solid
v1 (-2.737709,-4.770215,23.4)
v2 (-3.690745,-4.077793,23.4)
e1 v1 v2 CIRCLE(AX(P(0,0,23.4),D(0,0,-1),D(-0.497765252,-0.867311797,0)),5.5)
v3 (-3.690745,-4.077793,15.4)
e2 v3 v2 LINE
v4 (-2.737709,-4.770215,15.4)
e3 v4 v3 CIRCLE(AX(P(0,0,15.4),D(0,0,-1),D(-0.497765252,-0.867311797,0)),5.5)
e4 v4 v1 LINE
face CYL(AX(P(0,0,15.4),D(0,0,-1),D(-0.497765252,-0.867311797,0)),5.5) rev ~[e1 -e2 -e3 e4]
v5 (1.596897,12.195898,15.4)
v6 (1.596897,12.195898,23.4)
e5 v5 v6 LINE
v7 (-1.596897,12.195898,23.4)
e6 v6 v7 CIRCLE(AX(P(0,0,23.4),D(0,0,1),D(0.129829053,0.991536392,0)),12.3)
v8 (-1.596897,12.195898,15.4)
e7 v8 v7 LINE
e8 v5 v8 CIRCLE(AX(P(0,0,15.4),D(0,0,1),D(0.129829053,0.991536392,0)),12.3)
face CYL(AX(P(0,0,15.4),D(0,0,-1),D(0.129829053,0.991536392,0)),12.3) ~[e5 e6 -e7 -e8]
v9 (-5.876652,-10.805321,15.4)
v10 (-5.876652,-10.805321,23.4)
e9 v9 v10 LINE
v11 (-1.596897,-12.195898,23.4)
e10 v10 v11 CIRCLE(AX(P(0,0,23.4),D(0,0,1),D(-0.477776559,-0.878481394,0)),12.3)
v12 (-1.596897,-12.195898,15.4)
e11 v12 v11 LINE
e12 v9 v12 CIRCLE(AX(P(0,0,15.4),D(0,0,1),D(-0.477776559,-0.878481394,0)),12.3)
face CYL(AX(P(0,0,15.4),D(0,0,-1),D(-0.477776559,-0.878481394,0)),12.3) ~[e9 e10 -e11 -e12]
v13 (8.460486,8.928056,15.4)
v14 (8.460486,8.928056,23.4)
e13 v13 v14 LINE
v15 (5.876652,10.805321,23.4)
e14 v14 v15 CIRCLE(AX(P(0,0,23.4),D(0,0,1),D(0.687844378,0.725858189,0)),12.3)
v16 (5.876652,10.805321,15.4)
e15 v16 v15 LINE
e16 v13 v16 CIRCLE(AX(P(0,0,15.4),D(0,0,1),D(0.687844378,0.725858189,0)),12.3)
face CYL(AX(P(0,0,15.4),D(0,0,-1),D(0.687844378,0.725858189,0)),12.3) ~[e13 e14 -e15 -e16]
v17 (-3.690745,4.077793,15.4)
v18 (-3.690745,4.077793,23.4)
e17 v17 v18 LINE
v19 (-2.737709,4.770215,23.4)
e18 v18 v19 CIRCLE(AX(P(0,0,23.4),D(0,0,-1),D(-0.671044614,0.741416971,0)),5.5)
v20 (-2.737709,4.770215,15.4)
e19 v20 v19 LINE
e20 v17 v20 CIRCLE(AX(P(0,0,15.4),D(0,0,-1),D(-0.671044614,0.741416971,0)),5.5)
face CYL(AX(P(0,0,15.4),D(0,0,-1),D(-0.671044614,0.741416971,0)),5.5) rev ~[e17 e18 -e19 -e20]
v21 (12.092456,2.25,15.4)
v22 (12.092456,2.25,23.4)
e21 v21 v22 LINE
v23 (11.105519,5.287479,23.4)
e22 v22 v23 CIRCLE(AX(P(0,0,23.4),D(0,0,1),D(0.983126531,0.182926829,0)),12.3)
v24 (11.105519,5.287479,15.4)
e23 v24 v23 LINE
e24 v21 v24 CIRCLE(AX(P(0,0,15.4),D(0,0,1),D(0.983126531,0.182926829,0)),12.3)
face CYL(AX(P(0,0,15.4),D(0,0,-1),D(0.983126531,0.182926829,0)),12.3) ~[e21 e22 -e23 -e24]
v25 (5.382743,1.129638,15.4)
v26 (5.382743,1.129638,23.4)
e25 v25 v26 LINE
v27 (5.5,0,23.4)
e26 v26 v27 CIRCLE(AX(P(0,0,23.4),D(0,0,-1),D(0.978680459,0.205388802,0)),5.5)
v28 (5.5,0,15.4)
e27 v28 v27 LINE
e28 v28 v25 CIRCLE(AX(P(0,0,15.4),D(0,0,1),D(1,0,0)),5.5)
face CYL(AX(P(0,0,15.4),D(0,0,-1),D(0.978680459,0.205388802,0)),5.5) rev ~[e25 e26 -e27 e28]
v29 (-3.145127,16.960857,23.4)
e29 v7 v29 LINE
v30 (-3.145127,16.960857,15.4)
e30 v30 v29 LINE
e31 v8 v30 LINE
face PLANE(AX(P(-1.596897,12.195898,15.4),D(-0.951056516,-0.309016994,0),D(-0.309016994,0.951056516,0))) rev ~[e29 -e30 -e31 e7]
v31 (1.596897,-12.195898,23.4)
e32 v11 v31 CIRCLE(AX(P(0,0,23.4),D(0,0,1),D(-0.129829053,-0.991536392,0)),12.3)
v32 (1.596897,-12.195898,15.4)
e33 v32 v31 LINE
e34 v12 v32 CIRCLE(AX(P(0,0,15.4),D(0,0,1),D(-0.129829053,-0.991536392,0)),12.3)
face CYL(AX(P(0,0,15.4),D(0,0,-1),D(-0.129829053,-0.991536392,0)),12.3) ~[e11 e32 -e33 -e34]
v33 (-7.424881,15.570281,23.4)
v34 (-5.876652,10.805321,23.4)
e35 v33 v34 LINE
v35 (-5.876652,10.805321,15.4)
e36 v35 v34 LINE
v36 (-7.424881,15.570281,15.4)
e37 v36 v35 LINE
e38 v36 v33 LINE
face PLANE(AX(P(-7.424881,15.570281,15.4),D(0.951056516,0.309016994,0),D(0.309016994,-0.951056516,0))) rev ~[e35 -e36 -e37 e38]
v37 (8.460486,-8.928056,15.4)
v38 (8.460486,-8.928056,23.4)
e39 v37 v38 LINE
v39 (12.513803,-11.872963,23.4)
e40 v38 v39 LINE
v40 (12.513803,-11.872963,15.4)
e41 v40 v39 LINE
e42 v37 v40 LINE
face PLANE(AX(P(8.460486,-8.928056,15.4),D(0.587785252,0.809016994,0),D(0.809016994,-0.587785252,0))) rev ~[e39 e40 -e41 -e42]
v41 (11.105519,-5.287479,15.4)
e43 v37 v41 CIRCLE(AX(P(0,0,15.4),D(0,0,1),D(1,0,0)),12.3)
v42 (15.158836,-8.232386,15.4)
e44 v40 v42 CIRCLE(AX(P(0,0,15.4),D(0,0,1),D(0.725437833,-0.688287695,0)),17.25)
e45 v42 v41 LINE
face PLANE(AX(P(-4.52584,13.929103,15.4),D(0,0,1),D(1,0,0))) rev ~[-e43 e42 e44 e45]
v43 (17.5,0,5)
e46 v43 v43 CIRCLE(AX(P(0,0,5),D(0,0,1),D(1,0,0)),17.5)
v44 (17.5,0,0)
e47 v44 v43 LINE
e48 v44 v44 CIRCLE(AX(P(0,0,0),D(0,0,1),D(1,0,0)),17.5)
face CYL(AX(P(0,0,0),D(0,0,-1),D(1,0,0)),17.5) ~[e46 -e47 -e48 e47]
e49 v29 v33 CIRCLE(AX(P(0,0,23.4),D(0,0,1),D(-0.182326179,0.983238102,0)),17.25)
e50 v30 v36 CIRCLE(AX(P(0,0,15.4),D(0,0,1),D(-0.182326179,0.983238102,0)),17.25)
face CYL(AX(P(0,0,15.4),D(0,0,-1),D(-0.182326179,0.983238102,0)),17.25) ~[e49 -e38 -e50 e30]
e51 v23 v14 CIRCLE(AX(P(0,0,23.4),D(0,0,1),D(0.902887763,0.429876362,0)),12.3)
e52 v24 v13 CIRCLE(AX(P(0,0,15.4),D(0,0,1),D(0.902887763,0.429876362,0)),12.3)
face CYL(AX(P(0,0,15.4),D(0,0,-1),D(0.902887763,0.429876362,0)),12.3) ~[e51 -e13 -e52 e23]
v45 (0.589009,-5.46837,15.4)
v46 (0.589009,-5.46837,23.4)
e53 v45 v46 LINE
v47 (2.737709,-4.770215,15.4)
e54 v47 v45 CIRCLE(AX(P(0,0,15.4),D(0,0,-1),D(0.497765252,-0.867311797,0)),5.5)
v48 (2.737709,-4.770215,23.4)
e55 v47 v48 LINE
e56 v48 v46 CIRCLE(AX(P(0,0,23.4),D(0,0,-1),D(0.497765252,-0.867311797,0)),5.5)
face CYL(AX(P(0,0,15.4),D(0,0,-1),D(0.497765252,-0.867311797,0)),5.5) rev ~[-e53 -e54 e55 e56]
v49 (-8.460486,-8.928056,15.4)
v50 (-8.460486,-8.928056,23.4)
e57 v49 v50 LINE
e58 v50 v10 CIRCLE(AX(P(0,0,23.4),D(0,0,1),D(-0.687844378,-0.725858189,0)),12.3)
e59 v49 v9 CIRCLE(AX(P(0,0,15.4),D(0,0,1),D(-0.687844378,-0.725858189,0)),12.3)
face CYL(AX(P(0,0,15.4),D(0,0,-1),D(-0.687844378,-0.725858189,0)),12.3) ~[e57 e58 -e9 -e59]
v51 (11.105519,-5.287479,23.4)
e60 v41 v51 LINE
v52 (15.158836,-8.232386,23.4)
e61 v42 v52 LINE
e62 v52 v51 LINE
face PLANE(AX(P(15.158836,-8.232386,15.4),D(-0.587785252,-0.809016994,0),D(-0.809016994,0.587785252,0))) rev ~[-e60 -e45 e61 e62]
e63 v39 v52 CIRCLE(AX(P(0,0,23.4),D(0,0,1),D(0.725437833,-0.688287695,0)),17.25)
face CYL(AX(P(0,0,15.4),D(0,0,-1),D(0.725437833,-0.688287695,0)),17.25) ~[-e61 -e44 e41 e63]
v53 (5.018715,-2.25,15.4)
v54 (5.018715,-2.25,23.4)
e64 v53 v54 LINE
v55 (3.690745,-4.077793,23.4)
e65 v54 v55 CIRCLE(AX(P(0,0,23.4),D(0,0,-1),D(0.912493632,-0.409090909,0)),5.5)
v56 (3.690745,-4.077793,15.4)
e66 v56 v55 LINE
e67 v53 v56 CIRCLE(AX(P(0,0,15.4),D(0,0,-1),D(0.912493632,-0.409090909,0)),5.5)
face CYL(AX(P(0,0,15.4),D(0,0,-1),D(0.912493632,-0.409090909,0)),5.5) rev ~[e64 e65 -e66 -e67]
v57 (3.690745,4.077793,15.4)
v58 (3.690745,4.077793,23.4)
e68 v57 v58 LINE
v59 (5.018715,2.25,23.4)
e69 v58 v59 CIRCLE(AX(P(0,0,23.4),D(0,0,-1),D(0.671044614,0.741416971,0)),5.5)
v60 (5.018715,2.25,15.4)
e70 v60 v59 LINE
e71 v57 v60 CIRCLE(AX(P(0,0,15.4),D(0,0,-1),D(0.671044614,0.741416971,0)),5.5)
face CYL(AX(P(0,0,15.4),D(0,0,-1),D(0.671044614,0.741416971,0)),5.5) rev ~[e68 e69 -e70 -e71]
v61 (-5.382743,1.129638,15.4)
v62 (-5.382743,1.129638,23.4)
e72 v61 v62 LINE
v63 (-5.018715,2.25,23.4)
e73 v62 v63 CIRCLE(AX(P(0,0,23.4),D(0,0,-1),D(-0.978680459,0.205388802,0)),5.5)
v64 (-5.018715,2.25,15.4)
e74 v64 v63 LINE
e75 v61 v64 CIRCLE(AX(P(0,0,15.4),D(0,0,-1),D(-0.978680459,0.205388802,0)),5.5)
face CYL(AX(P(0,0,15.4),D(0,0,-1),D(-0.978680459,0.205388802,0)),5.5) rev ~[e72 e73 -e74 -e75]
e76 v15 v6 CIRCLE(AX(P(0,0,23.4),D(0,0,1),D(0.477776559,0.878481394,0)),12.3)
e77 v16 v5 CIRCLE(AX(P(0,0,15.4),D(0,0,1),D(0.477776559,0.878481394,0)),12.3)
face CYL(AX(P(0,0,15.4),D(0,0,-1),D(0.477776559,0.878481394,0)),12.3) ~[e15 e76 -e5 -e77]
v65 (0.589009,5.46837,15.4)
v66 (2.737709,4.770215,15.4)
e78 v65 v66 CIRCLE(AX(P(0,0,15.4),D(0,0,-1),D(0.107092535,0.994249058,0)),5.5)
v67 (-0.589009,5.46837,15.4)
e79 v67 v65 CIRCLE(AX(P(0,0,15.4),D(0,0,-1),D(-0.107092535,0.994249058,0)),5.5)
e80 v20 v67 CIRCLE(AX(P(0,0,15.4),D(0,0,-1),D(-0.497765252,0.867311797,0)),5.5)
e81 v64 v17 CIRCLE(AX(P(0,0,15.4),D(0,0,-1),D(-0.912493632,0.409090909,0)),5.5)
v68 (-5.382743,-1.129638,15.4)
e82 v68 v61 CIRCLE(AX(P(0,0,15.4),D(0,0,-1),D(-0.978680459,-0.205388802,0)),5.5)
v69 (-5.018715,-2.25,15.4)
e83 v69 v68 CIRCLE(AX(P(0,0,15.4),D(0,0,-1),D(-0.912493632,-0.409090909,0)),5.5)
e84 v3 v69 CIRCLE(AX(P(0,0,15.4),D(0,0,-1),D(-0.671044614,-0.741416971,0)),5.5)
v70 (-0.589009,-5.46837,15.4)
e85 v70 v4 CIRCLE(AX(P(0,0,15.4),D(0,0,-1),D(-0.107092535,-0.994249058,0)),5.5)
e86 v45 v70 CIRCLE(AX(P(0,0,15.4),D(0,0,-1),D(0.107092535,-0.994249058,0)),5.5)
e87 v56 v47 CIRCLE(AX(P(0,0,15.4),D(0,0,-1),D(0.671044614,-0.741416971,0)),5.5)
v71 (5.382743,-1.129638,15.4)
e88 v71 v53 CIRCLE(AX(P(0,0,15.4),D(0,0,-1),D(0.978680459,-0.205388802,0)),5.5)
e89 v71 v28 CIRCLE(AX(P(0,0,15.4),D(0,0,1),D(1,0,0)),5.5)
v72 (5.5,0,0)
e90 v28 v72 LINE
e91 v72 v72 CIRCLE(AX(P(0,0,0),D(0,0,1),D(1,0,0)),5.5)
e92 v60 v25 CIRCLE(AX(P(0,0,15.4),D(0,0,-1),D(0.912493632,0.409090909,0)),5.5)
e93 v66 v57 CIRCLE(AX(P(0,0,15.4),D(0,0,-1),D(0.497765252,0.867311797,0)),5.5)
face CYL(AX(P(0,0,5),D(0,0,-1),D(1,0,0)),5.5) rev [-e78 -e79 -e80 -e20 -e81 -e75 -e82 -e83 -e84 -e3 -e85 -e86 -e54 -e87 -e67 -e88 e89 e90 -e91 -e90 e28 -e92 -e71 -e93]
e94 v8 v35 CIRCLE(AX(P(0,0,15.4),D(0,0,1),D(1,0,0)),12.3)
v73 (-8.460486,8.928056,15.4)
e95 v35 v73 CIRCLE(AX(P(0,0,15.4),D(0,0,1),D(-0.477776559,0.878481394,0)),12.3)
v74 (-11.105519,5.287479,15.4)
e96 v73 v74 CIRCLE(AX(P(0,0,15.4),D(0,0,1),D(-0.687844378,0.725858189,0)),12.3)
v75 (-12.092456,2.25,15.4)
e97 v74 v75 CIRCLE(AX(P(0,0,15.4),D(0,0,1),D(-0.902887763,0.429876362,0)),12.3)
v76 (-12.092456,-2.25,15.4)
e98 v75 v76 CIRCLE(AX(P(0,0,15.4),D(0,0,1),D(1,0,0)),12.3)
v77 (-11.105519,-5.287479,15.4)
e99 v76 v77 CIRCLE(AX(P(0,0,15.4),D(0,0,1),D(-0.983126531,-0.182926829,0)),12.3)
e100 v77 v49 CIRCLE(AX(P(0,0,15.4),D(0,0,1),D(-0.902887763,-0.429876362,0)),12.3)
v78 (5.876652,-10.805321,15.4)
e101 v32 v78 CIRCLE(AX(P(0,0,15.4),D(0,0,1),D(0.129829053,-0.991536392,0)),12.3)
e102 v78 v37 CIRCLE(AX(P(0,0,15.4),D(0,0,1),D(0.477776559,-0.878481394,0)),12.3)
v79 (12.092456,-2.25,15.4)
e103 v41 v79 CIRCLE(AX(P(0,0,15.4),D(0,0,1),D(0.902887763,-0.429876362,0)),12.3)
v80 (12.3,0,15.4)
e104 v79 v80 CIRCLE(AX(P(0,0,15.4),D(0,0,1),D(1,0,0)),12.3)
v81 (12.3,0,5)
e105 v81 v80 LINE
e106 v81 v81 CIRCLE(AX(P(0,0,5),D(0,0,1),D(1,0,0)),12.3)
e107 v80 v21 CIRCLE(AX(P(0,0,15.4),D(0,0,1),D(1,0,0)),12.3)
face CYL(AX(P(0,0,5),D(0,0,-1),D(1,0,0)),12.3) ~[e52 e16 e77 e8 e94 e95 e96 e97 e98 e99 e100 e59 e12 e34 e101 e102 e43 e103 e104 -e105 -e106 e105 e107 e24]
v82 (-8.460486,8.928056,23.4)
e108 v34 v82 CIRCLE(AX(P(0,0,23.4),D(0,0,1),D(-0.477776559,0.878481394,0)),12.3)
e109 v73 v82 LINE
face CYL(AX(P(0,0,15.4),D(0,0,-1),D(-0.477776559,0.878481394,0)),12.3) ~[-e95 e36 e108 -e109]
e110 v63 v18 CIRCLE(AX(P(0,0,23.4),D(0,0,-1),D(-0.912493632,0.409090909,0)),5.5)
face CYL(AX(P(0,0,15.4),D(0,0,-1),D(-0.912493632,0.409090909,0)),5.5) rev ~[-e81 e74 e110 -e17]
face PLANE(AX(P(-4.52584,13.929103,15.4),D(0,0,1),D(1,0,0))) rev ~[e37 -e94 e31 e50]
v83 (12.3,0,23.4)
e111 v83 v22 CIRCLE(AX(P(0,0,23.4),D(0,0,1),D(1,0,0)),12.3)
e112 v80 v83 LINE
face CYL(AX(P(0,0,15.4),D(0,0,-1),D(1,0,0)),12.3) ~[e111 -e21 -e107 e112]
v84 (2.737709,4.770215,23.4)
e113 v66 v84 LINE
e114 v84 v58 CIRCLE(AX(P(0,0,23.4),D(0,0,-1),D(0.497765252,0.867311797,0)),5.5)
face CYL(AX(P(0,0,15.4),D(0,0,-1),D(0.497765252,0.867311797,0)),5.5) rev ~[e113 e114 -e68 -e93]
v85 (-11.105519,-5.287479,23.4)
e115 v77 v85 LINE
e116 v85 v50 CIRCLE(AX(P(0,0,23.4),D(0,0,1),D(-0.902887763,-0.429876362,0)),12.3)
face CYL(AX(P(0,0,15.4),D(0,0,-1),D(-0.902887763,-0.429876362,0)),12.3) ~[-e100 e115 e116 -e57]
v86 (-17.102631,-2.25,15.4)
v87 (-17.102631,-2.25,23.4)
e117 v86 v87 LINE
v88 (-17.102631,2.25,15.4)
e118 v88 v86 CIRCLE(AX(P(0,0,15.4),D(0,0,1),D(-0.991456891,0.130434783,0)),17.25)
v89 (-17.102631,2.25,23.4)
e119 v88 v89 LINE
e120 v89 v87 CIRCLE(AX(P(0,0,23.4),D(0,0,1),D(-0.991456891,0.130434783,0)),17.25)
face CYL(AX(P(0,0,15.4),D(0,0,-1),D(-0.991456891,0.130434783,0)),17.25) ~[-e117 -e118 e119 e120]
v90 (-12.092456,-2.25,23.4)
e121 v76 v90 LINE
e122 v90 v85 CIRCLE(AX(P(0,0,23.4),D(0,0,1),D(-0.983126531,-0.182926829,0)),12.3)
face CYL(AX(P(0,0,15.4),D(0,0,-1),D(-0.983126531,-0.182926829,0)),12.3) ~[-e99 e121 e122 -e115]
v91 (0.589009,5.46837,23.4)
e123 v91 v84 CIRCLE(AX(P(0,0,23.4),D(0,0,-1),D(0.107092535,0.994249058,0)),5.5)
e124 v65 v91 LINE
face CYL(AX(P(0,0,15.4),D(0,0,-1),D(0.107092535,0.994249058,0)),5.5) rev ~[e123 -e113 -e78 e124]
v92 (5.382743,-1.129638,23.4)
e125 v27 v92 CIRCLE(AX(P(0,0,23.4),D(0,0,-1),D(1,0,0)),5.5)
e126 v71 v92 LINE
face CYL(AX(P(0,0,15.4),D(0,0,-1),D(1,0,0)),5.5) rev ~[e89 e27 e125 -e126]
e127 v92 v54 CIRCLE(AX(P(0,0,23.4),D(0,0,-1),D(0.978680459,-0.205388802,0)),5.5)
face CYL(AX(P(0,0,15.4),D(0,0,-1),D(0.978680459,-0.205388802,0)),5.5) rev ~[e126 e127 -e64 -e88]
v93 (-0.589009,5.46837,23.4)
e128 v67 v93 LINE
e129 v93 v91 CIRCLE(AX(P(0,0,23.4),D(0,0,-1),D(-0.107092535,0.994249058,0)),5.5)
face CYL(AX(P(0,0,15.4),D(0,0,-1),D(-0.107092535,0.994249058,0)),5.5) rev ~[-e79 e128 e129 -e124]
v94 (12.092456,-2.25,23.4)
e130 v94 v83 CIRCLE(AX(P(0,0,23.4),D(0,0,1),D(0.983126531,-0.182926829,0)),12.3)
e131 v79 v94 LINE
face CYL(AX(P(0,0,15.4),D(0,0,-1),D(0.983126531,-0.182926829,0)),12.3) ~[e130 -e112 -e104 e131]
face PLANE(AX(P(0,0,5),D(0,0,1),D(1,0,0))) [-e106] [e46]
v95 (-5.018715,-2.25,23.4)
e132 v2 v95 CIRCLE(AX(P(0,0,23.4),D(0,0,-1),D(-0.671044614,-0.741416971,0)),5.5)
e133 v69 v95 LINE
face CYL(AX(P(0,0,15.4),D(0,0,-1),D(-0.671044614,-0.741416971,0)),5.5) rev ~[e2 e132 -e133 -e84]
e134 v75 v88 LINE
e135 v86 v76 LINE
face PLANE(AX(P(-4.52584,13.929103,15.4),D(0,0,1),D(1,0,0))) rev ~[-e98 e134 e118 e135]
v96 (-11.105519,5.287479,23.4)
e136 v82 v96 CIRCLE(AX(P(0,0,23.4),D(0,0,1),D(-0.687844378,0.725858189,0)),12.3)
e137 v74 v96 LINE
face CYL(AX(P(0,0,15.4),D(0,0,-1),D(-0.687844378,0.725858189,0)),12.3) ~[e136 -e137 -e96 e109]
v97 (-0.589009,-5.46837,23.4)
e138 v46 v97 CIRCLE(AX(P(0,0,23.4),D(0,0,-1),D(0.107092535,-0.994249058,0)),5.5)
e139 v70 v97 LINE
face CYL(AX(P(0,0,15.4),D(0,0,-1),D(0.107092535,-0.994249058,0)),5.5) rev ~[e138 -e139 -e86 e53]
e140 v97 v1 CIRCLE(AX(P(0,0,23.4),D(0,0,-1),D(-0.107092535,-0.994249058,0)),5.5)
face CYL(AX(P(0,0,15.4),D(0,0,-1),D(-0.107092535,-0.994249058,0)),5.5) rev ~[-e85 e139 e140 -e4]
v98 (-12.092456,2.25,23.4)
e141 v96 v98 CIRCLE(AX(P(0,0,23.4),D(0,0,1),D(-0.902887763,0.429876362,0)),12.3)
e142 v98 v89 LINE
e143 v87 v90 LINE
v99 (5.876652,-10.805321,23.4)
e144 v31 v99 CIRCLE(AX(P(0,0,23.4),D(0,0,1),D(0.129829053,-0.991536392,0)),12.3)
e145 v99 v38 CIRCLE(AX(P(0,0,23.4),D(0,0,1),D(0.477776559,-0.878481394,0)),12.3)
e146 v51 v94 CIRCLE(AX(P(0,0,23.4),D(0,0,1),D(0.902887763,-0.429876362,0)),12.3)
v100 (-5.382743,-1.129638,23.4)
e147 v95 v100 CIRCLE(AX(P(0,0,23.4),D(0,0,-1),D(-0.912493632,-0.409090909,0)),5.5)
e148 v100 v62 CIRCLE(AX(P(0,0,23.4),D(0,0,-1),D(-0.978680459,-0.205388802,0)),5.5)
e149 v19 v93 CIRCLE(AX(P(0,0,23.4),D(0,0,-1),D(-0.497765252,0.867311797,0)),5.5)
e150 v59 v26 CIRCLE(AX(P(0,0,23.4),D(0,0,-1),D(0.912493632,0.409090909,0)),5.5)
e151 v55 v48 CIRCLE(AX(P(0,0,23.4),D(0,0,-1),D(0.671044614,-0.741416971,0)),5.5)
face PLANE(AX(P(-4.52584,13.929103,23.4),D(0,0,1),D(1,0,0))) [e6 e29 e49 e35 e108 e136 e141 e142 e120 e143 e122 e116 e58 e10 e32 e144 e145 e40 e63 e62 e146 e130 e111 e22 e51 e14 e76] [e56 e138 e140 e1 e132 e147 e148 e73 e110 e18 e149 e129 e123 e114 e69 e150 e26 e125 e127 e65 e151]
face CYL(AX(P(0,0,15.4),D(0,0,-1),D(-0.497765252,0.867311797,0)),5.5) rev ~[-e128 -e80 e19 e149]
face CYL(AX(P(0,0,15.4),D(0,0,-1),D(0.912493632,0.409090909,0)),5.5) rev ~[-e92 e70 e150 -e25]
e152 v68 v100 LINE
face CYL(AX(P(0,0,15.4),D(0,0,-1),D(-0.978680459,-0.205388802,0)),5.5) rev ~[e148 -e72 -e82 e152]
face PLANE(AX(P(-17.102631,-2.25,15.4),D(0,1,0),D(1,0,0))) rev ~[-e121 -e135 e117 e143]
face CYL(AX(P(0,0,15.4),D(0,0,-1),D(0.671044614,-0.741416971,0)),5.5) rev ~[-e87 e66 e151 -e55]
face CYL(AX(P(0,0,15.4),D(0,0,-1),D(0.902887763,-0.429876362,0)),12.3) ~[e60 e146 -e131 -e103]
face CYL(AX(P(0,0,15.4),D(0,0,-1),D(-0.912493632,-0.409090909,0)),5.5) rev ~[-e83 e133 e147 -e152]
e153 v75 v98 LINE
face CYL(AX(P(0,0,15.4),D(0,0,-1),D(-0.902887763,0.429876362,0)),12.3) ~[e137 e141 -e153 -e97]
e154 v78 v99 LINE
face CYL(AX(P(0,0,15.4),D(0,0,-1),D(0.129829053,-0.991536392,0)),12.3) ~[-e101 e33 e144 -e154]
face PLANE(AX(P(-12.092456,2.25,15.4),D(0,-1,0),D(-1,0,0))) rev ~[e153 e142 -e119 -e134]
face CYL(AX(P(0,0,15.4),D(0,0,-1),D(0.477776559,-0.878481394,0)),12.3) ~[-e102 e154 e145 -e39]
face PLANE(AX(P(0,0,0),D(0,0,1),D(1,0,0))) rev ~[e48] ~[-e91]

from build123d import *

# Parameters (mm, degrees)
F0_R     = 17.5
F0_R_2   = 5.5
F1_DEPTH = 5
F2_R     = 12.3
F2_R_2   = 5.5
F3_DEPTH = 10.4
F5_DEPTH = 8


with BuildPart() as f1:
    # F0 (on Top) → F1 (new body)
    with BuildSketch(Plane.XY):
        Circle(F0_R)
        Circle(F0_R_2, mode=Mode.SUBTRACT)
    extrude(amount=F1_DEPTH)

    # F2 (on face) → F3 (join)
    with BuildSketch(Plane.XY.offset(5)):
        Circle(F2_R)
        Circle(F2_R_2, mode=Mode.SUBTRACT)
    extrude(amount=F3_DEPTH)

    # F4 (on face) → F5 (join)
    with BuildSketch(Plane.XY.offset(15.4)):
        with BuildLine():
            Line((-1.5968973469, 12.1958976243), (-3.1451265822, 16.9608572537))
            ThreePointArc((-3.1451265822, 16.9608572537), (-5.330543153, 16.4057249061), (-7.4248809055, 15.5702807791))
            Line((-7.4248809055, 15.5702807791), (-5.8766516702, 10.8053211497))
            ThreePointArc((-5.8766516702, 10.8053211497), (-3.8009090308, 11.6979951504), (-1.5968973469, 12.1958976243))
        make_face()
        with BuildLine():
            ThreePointArc((-17.1026313765, 2.25), (-17.25, 0), (-17.1026313765, -2.25))
            Line((-17.1026313765, -2.25), (-12.0924563262, -2.25))
            ThreePointArc((-12.0924563262, -2.25), (-12.3, 0), (-12.0924563262, 2.25))
            Line((-12.0924563262, 2.25), (-17.1026313765, 2.25))
        make_face()
        with BuildLine():
            ThreePointArc((12.5138026145, -11.8729627358), (13.955543153, -10.139295602), (15.1588362498, -8.2323862612))
            Line((15.1588362498, -8.2323862612), (11.1055194893, -5.2874792552))
            ThreePointArc((11.1055194893, -5.2874792552), (9.9509090308, -7.2297586032), (8.4604858539, -8.9280557298))
            Line((8.4604858539, -8.9280557298), (12.5138026145, -11.8729627358))
        make_face()
        with BuildLine():
            Line((11.1055194893, -5.2874792552), (6.9247879586, -2.25))
            Line((6.9247879586, -2.25), (5.018714975, -2.25))
            ThreePointArc((5.018714975, -2.25), (4.4495934691, -3.2328188876), (3.6907453789, -4.077793343))
            Line((3.6907453789, -4.077793343), (4.2797543233, -5.8905764747))
            Line((4.2797543233, -5.8905764747), (8.4604858539, -8.9280557298))
            ThreePointArc((8.4604858539, -8.9280557298), (9.9509090308, -7.2297586032), (11.1055194893, -5.2874792552))
        make_face()
        with BuildLine():
            ThreePointArc((11.1055194893, -5.2874792552), (11.6979951504, -3.8009090308), (12.0924563262, -2.25))
            Line((12.0924563262, -2.25), (6.9247879586, -2.25))
            Line((6.9247879586, -2.25), (11.1055194893, -5.2874792552))
        make_face()
        with BuildLine():
            Line((6.9247879586, -2.25), (12.0924563262, -2.25))
            ThreePointArc((12.0924563262, -2.25), (12.2480041805, -1.1297759044), (12.3, 0))
            ThreePointArc((12.3, 0), (12.2480041805, 1.1297759044), (12.0924563262, 2.25))
            Line((12.0924563262, 2.25), (6.9247879586, 2.25))
            Line((6.9247879586, 2.25), (5.3827425223, 1.1296384104))
            ThreePointArc((5.3827425223, 1.1296384104), (5.4706070903, 0.5678539104), (5.5, 0))
            ThreePointArc((5.5, 0), (5.4706070903, -0.5678539104), (5.3827425223, -1.1296384104))
            Line((5.3827425223, -1.1296384104), (6.9247879586, -2.25))
        make_face()
        with BuildLine():
            Line((6.9247879586, 2.25), (12.0924563262, 2.25))
            ThreePointArc((12.0924563262, 2.25), (11.6979951504, 3.8009090308), (11.1055194893, 5.2874792552))
            Line((11.1055194893, 5.2874792552), (6.9247879586, 2.25))
        make_face()
        with BuildLine():
            Line((5.018714975, 2.25), (6.9247879586, 2.25))
            Line((6.9247879586, 2.25), (11.1055194893, 5.2874792552))
            ThreePointArc((11.1055194893, 5.2874792552), (9.9509090308, 7.2297586032), (8.4604858539, 8.9280557298))
            Line((8.4604858539, 8.9280557298), (4.2797543233, 5.8905764747))
            Line((4.2797543233, 5.8905764747), (3.6907453789, 4.077793343))
            ThreePointArc((3.6907453789, 4.077793343), (4.4495934691, 3.2328188876), (5.018714975, 2.25))
        make_face()
        with BuildLine():
            Line((4.2797543233, 5.8905764747), (8.4604858539, 8.9280557298))
            ThreePointArc((8.4604858539, 8.9280557298), (7.2297586032, 9.9509090308), (5.8766516702, 10.8053211497))
            Line((5.8766516702, 10.8053211497), (4.2797543233, 5.8905764747))
        make_face()
        with BuildLine():
            Line((2.737708887, 4.7702148851), (4.2797543233, 5.8905764747))
            Line((4.2797543233, 5.8905764747), (5.8766516702, 10.8053211497))
            ThreePointArc((5.8766516702, 10.8053211497), (3.8009090308, 11.6979951504), (1.5968973469, 12.1958976243))
            Line((1.5968973469, 12.1958976243), (0, 7.2811529494))
            Line((0, 7.2811529494), (0.5890089445, 5.4683698177))
            ThreePointArc((0.5890089445, 5.4683698177), (1.6995934691, 5.2308108396), (2.737708887, 4.7702148851))
        make_face()
        with BuildLine():
            Line((0, 7.2811529494), (1.5968973469, 12.1958976243))
            ThreePointArc((1.5968973469, 12.1958976243), (0, 12.3), (-1.5968973469, 12.1958976243))
            Line((-1.5968973469, 12.1958976243), (0, 7.2811529494))
        make_face()
        with BuildLine():
            Line((-0.5890089445, 5.4683698177), (0, 7.2811529494))
            Line((0, 7.2811529494), (-1.5968973469, 12.1958976243))
            ThreePointArc((-1.5968973469, 12.1958976243), (-3.8009090308, 11.6979951504), (-5.8766516702, 10.8053211497))
            Line((-5.8766516702, 10.8053211497), (-4.2797543233, 5.8905764747))
            Line((-4.2797543233, 5.8905764747), (-2.737708887, 4.7702148851))
            ThreePointArc((-2.737708887, 4.7702148851), (-1.6995934691, 5.2308108396), (-0.5890089445, 5.4683698177))
        make_face()
        with BuildLine():
            Line((-4.2797543233, 5.8905764747), (-5.8766516702, 10.8053211497))
            ThreePointArc((-5.8766516702, 10.8053211497), (-7.2297586032, 9.9509090308), (-8.4604858539, 8.9280557298))
            Line((-8.4604858539, 8.9280557298), (-4.2797543233, 5.8905764747))
        make_face()
        with BuildLine():
            Line((-3.6907453789, 4.077793343), (-4.2797543233, 5.8905764747))
            Line((-4.2797543233, 5.8905764747), (-8.4604858539, 8.9280557298))
            ThreePointArc((-8.4604858539, 8.9280557298), (-9.9509090308, 7.2297586032), (-11.1055194893, 5.2874792552))
            Line((-11.1055194893, 5.2874792552), (-6.9247879586, 2.25))
            Line((-6.9247879586, 2.25), (-5.018714975, 2.25))
            ThreePointArc((-5.018714975, 2.25), (-4.4495934691, 3.2328188876), (-3.6907453789, 4.077793343))
        make_face()
        with BuildLine():
            Line((-6.9247879586, 2.25), (-11.1055194893, 5.2874792552))
            ThreePointArc((-11.1055194893, 5.2874792552), (-11.6979951504, 3.8009090308), (-12.0924563262, 2.25))
            Line((-12.0924563262, 2.25), (-6.9247879586, 2.25))
        make_face()
        with BuildLine():
            Line((-12.0924563262, -2.25), (-6.9247879586, -2.25))
            Line((-6.9247879586, -2.25), (-5.3827425223, -1.1296384104))
            ThreePointArc((-5.3827425223, -1.1296384104), (-5.5, 0), (-5.3827425223, 1.1296384104))
            Line((-5.3827425223, 1.1296384104), (-6.9247879586, 2.25))
            Line((-6.9247879586, 2.25), (-12.0924563262, 2.25))
            ThreePointArc((-12.0924563262, 2.25), (-12.3, 0), (-12.0924563262, -2.25))
        make_face()
        with BuildLine():
            ThreePointArc((-12.0924563262, -2.25), (-11.6979951504, -3.8009090308), (-11.1055194893, -5.2874792552))
            Line((-11.1055194893, -5.2874792552), (-6.9247879586, -2.25))
            Line((-6.9247879586, -2.25), (-12.0924563262, -2.25))
        make_face()
        with BuildLine():
            Line((-8.4604858539, -8.9280557298), (-4.2797543233, -5.8905764747))
            Line((-4.2797543233, -5.8905764747), (-3.6907453789, -4.077793343))
            ThreePointArc((-3.6907453789, -4.077793343), (-4.4495934691, -3.2328188876), (-5.018714975, -2.25))
            Line((-5.018714975, -2.25), (-6.9247879586, -2.25))
            Line((-6.9247879586, -2.25), (-11.1055194893, -5.2874792552))
            ThreePointArc((-11.1055194893, -5.2874792552), (-9.9509090308, -7.2297586032), (-8.4604858539, -8.9280557298))
        make_face()
        with BuildLine():
            ThreePointArc((-8.4604858539, -8.9280557298), (-7.2297586032, -9.9509090308), (-5.8766516702, -10.8053211497))
            Line((-5.8766516702, -10.8053211497), (-4.2797543233, -5.8905764747))
            Line((-4.2797543233, -5.8905764747), (-8.4604858539, -8.9280557298))
        make_face()
        with BuildLine():
            Line((-1.5968973469, -12.1958976243), (0, -7.2811529494))
            Line((0, -7.2811529494), (-0.5890089445, -5.4683698177))
            ThreePointArc((-0.5890089445, -5.4683698177), (-1.6995934691, -5.2308108396), (-2.737708887, -4.7702148851))
            Line((-2.737708887, -4.7702148851), (-4.2797543233, -5.8905764747))
            Line((-4.2797543233, -5.8905764747), (-5.8766516702, -10.8053211497))
            ThreePointArc((-5.8766516702, -10.8053211497), (-3.8009090308, -11.6979951504), (-1.5968973469, -12.1958976243))
        make_face()
        with BuildLine():
            ThreePointArc((-1.5968973469, -12.1958976243), (0, -12.3), (1.5968973469, -12.1958976243))
            Line((1.5968973469, -12.1958976243), (0, -7.2811529494))
            Line((0, -7.2811529494), (-1.5968973469, -12.1958976243))
        make_face()
        with BuildLine():
            Line((5.8766516702, -10.8053211497), (4.2797543233, -5.8905764747))
            Line((4.2797543233, -5.8905764747), (2.737708887, -4.7702148851))
            ThreePointArc((2.737708887, -4.7702148851), (1.6995934691, -5.2308108396), (0.5890089445, -5.4683698177))
            Line((0.5890089445, -5.4683698177), (0, -7.2811529494))
            Line((0, -7.2811529494), (1.5968973469, -12.1958976243))
            ThreePointArc((1.5968973469, -12.1958976243), (3.8009090308, -11.6979951504), (5.8766516702, -10.8053211497))
        make_face()
        with BuildLine():
            ThreePointArc((5.8766516702, -10.8053211497), (7.2297586032, -9.9509090308), (8.4604858539, -8.9280557298))
            Line((8.4604858539, -8.9280557298), (4.2797543233, -5.8905764747))
            Line((4.2797543233, -5.8905764747), (5.8766516702, -10.8053211497))
        make_face()
        with BuildLine():
            Line((4.2797543233, -5.8905764747), (3.6907453789, -4.077793343))
            ThreePointArc((3.6907453789, -4.077793343), (3.2328188876, -4.4495934691), (2.737708887, -4.7702148851))
            Line((2.737708887, -4.7702148851), (4.2797543233, -5.8905764747))
        make_face()
        with BuildLine():
            Line((5.018714975, -2.25), (6.9247879586, -2.25))
            Line((6.9247879586, -2.25), (5.3827425223, -1.1296384104))
            ThreePointArc((5.3827425223, -1.1296384104), (5.2308108396, -1.6995934691), (5.018714975, -2.25))
        make_face()
        with BuildLine():
            Line((5.3827425223, 1.1296384104), (6.9247879586, 2.25))
            Line((6.9247879586, 2.25), (5.018714975, 2.25))
            ThreePointArc((5.018714975, 2.25), (5.2308108396, 1.6995934691), (5.3827425223, 1.1296384104))
        make_face()
        with BuildLine():
            ThreePointArc((2.737708887, 4.7702148851), (3.2328188876, 4.4495934691), (3.6907453789, 4.077793343))
            Line((3.6907453789, 4.077793343), (4.2797543233, 5.8905764747))
            Line((4.2797543233, 5.8905764747), (2.737708887, 4.7702148851))
        make_face()
        with BuildLine():
            ThreePointArc((-0.5890089445, 5.4683698177), (0, 5.5), (0.5890089445, 5.4683698177))
            Line((0.5890089445, 5.4683698177), (0, 7.2811529494))
            Line((0, 7.2811529494), (-0.5890089445, 5.4683698177))
        make_face()
        with BuildLine():
            ThreePointArc((-3.6907453789, 4.077793343), (-3.2328188876, 4.4495934691), (-2.737708887, 4.7702148851))
            Line((-2.737708887, 4.7702148851), (-4.2797543233, 5.8905764747))
            Line((-4.2797543233, 5.8905764747), (-3.6907453789, 4.077793343))
        make_face()
        with BuildLine():
            Line((-6.9247879586, 2.25), (-5.3827425223, 1.1296384104))
            ThreePointArc((-5.3827425223, 1.1296384104), (-5.2308108396, 1.6995934691), (-5.018714975, 2.25))
            Line((-5.018714975, 2.25), (-6.9247879586, 2.25))
        make_face()
        with BuildLine():
            Line((-6.9247879586, -2.25), (-5.018714975, -2.25))
            ThreePointArc((-5.018714975, -2.25), (-5.2308108396, -1.6995934691), (-5.3827425223, -1.1296384104))
            Line((-5.3827425223, -1.1296384104), (-6.9247879586, -2.25))
        make_face()
        with BuildLine():
            Line((-4.2797543233, -5.8905764747), (-2.737708887, -4.7702148851))
            ThreePointArc((-2.737708887, -4.7702148851), (-3.2328188876, -4.4495934691), (-3.6907453789, -4.077793343))
            Line((-3.6907453789, -4.077793343), (-4.2797543233, -5.8905764747))
        make_face()
        with BuildLine():
            Line((0, -7.2811529494), (0.5890089445, -5.4683698177))
            ThreePointArc((0.5890089445, -5.4683698177), (0, -5.5), (-0.5890089445, -5.4683698177))
            Line((-0.5890089445, -5.4683698177), (0, -7.2811529494))
        make_face()
    extrude(amount=F5_DEPTH)


solid = f1.part
